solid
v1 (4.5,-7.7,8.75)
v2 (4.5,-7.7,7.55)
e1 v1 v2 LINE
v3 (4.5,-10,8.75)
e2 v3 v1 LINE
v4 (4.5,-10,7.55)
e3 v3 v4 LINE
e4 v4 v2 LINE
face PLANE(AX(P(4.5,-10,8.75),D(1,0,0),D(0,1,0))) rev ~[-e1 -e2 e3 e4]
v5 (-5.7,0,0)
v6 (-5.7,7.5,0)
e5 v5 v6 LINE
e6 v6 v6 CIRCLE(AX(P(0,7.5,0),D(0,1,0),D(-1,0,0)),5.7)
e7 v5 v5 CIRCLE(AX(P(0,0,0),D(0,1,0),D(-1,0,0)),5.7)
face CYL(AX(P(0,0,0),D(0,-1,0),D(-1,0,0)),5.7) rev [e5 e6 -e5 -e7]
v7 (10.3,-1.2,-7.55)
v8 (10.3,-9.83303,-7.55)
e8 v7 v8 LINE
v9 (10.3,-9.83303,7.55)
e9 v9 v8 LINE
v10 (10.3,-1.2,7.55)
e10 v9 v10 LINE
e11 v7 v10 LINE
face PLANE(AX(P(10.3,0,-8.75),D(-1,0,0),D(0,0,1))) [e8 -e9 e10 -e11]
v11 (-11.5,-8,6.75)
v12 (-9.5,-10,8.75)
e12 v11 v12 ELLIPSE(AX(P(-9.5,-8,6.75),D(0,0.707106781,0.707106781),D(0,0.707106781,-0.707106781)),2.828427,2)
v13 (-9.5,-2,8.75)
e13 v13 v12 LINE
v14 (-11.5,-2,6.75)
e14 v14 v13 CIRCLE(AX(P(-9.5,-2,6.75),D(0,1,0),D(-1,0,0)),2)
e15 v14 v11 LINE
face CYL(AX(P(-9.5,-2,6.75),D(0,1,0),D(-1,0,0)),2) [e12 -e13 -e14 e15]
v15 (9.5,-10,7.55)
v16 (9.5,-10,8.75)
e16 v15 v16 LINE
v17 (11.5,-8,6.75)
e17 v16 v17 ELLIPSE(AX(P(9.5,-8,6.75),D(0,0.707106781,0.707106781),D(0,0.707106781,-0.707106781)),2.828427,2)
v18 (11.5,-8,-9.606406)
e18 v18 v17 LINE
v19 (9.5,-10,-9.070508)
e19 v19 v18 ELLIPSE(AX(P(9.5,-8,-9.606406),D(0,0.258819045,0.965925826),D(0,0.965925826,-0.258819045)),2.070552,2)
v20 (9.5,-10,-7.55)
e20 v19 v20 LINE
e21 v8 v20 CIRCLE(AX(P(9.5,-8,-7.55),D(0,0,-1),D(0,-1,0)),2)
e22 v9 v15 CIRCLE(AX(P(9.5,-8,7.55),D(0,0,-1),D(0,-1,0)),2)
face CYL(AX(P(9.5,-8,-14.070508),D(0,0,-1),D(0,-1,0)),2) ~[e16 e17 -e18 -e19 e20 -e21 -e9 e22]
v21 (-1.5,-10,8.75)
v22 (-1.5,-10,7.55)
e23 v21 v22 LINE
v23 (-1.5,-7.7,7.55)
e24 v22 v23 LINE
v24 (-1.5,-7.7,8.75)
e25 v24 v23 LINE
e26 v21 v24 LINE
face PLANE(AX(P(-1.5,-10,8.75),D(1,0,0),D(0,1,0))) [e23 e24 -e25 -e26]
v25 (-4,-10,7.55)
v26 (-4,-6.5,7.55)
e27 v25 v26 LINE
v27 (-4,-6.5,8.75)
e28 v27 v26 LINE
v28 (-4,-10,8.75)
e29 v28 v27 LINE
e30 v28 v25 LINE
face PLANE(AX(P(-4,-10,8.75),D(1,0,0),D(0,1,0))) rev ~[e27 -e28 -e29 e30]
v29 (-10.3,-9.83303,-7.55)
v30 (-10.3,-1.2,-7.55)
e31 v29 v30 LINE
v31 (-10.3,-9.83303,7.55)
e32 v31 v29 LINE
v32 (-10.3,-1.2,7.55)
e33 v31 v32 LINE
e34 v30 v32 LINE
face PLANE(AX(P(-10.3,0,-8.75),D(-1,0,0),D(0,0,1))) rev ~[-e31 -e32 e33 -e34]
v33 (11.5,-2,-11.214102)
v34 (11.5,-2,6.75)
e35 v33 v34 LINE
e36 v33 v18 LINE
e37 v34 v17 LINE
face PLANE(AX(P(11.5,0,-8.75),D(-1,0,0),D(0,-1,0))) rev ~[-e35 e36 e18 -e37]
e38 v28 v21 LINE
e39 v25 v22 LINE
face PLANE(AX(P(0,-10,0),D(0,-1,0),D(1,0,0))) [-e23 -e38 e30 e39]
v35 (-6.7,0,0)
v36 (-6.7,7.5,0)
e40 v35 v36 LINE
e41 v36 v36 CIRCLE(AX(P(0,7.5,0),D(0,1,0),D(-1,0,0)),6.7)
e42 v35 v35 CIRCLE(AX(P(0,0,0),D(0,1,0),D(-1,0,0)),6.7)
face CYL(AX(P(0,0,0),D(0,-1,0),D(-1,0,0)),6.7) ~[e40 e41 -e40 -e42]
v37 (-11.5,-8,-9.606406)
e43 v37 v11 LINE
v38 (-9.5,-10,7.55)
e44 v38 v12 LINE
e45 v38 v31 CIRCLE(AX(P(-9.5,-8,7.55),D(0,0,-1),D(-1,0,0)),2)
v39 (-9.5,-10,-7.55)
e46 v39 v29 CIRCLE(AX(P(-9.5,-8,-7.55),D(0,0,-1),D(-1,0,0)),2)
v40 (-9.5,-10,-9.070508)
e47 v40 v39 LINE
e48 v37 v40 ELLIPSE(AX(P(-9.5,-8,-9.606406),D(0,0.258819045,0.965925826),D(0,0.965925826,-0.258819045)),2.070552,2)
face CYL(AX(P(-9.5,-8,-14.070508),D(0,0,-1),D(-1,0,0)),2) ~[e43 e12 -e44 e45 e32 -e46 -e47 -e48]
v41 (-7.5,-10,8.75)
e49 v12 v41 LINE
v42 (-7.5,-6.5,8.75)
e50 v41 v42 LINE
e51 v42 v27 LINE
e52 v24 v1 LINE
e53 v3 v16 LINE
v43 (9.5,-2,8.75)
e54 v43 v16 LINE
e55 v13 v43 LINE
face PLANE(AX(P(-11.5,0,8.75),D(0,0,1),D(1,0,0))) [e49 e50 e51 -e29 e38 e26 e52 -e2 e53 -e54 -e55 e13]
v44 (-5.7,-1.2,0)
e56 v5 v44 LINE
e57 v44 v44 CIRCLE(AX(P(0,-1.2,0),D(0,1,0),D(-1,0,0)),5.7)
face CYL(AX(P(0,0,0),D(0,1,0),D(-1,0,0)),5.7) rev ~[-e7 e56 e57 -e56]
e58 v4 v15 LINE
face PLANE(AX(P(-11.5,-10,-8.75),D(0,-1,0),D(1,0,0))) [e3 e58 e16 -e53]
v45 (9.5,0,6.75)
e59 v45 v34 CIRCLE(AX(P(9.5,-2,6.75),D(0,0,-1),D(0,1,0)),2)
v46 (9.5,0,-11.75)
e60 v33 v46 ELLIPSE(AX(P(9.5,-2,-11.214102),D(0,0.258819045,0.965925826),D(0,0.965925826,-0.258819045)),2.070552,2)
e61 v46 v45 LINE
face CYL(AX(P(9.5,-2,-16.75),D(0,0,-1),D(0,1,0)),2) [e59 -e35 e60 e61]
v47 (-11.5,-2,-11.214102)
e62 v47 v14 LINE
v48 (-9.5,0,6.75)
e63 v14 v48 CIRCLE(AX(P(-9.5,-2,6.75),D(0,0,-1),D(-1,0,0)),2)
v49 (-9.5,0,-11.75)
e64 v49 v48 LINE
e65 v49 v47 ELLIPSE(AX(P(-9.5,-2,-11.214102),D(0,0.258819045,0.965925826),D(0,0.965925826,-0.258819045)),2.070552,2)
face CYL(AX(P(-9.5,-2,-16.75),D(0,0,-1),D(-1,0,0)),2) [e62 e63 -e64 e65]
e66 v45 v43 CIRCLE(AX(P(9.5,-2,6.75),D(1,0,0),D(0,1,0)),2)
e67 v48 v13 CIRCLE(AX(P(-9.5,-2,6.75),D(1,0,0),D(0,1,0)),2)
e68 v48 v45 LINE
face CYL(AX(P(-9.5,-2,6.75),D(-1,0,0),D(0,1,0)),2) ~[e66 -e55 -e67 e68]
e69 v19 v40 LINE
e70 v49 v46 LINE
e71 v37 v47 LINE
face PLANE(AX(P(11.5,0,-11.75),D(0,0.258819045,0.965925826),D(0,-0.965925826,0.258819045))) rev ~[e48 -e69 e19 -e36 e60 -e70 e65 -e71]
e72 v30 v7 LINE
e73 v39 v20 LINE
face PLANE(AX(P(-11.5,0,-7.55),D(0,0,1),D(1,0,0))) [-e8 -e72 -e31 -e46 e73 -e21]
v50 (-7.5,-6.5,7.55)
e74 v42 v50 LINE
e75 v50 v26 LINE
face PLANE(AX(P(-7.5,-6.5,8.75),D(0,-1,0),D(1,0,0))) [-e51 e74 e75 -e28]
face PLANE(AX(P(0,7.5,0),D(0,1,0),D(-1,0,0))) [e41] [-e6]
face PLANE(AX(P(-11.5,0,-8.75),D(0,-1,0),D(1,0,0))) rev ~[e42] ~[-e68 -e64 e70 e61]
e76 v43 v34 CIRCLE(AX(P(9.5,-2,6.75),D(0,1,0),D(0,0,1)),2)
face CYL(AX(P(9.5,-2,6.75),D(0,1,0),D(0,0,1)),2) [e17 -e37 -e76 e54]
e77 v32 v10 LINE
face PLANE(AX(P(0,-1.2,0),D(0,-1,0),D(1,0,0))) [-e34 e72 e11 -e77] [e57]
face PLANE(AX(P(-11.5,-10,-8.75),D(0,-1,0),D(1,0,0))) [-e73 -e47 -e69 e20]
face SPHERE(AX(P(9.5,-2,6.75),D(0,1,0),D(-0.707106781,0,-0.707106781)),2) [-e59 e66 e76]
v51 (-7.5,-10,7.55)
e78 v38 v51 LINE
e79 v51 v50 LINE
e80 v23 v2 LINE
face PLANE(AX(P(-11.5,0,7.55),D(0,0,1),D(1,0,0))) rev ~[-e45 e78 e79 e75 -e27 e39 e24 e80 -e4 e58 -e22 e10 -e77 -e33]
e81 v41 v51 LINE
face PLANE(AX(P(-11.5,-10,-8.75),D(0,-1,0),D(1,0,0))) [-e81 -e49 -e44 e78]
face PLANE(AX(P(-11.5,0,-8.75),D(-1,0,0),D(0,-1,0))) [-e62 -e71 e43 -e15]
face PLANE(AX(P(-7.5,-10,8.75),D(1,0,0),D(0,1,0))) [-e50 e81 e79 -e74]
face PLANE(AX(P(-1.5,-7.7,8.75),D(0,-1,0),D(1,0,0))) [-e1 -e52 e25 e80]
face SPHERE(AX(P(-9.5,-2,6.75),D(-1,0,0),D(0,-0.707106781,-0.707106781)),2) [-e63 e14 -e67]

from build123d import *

# Parameters (mm, degrees)
F0_W          = 23
F0_H          = 17.5
F1_DEPTH      = 10
F2_T          = -1.2
F3_R          = 5.7
F4_DEPTH      = 3
F3_R_2        = 6.7
F5_DEPTH      = 7.5
F6_W          = 6
F6_H          = 2.3
F6_W_2        = 3.5
F6_H_2        = 3.5
F7_DEPTH      = 4
F8_DEPTH      = 3
F10_DEPTH     = 30
F11_T1_DEPTH  = 19
F11_T3_DEPTH  = 23.5
F11_T5_DEPTH  = 13
F11_T7_DEPTH  = 27.8205080757
F11_S11_W     = 2
F11_S11_H     = 2
F11_T12_DEPTH = 2
F11_S17_W     = 2
F11_S17_H     = 2
F11_T18_DEPTH = 2


# Not quite as in the source:
# - a fillet or chamfer that OpenCascade refuses, or shapes differently, is made with other operations: its cross-section is extruded or revolved along the edge and cut away or added


with BuildPart() as f1:
    # F0 (on Front) → F1 (new body)
    with BuildSketch(Plane.XZ):
        Rectangle(F0_W, F0_H)
    extrude(amount=F1_DEPTH)

    # F2
    f2_openings = [f1.faces().sort_by_distance(p)[0] for p in [
        (0, -10, 0),
    ]]
    offset(amount=F2_T, openings=f2_openings)

    # F3 (on face) → F4 (cut)
    with BuildSketch(Plane(origin=(0, 0, 0), x_dir=(-1, 0, 0), z_dir=(0, 1, 0))):
        Circle(F3_R)
    extrude(amount=-F4_DEPTH, mode=Mode.SUBTRACT)

    # F3 (on face) → F5 (join)
    with BuildSketch(Plane(origin=(0, 0, 0), x_dir=(-1, 0, 0), z_dir=(0, 1, 0))):
        Circle(F3_R_2)
        Circle(F3_R, mode=Mode.SUBTRACT)
    extrude(amount=F5_DEPTH)

    # F6 (on face) → F7 (cut)
    with BuildSketch(Plane.XY.offset(8.75)):
        with Locations((1.5, -8.85)):
            Rectangle(F6_W, F6_H)
        with Locations((-5.75, -8.25)):
            Rectangle(F6_W_2, F6_H_2)
    extrude(amount=-F7_DEPTH, mode=Mode.SUBTRACT)

    # F8 (add): a face of the model
    f8_faces = [f1.faces().sort_by_distance(p)[0] for p in [
        (0, -5, -8.75),
    ]]
    extrude(f8_faces, amount=F8_DEPTH)

    # F9 (on face) → F10 (cut)
    with BuildSketch(Plane.YZ.offset(11.5)):
        Polygon((-10, -11.75), (0, -11.75), (-10, -9.0705080757), align=None)
    extrude(amount=-F10_DEPTH, mode=Mode.SUBTRACT)

    # F11: fillet of radius 2 on 7 edges, made by hand

    # F11_s2 → F11_t1 (cut)
    with BuildSketch(Plane.YZ.offset(-9.5)):
        with BuildLine():
            ThreePointArc((0, 6.75), (-0.5857864376, 8.1642135624), (-2, 8.75))
            Line((-2, 8.75), (0, 8.75))
            Line((0, 8.75), (0, 6.75))
        make_face()
    extrude(amount=F11_T1_DEPTH, mode=Mode.SUBTRACT)

    # F11_s4 → F11_t3 (cut)
    with BuildSketch(Plane.XY.offset(-16.75)):
        with BuildLine():
            ThreePointArc((-11.5, -2), (-10.9142135624, -0.5857864376), (-9.5, 0))
            Line((-9.5, 0), (-11.5, 0))
            Line((-11.5, 0), (-11.5, -2))
        make_face()
        with BuildLine():
            ThreePointArc((9.5, 0), (10.9142135624, -0.5857864376), (11.5, -2))
            Line((11.5, -2), (11.5, 0))
            Line((11.5, 0), (9.5, 0))
        make_face()
    extrude(amount=F11_T3_DEPTH, mode=Mode.SUBTRACT)

    # F11_s6 → F11_t5 (cut)
    with BuildSketch(Plane.XZ.offset(2)):
        with BuildLine():
            ThreePointArc((9.5, 8.75), (10.9142135624, 8.1642135624), (11.5, 6.75))
            Line((11.5, 6.75), (11.5, 8.75))
            Line((11.5, 8.75), (9.5, 8.75))
        make_face()
        with BuildLine():
            ThreePointArc((-11.5, 6.75), (-10.9142135624, 8.1642135624), (-9.5, 8.75))
            Line((-9.5, 8.75), (-11.5, 8.75))
            Line((-11.5, 8.75), (-11.5, 6.75))
        make_face()
    extrude(amount=F11_T5_DEPTH, mode=Mode.SUBTRACT)

    # F11_s8 → F11_t7 (cut)
    with BuildSketch(Plane.XY.offset(-14.0705080757)):
        with BuildLine():
            ThreePointArc((-11.5, -8), (-10.9142135624, -9.4142135624), (-9.5, -10))
            Line((-9.5, -10), (-11.5, -10))
            Line((-11.5, -10), (-11.5, -8))
        make_face()
        with BuildLine():
            ThreePointArc((9.5, -10), (10.9142135624, -9.4142135624), (11.5, -8))
            Line((11.5, -8), (11.5, -10))
            Line((11.5, -10), (9.5, -10))
        make_face()
    extrude(amount=F11_T7_DEPTH, mode=Mode.SUBTRACT)


with BuildPart() as f11_tool10:
    # F11_s11 → F11_t12 (new body)
    with BuildSketch(Plane.XZ.offset(2)):
        with Locations((10.5, 7.75)):
            Rectangle(F11_S11_W, F11_S11_H)
    extrude(amount=-F11_T12_DEPTH)

    # F11_s13 → F11_t14 (revolve, cut)
    with BuildSketch(Plane(origin=(9.5, -2, 6.75), x_dir=(-0.7071067812, 0, -0.7071067812), z_dir=(0.7071067812, 0, -0.7071067812))):
        with BuildLine():
            ThreePointArc((0, -2), (2, 0), (0, 2))
            Line((0, 2), (0, -2))
        make_face()
    revolve(axis=Axis((9.5, -2, 6.75), (0, 1, 0)), mode=Mode.SUBTRACT)


with BuildPart() as f1_1:
    add(f1.part)

    # F11_t9: cut F11_tool10
    add(f11_tool10.part, mode=Mode.SUBTRACT)


with BuildPart() as f11_tool16:
    # F11_s17 → F11_t18 (new body)
    with BuildSketch(Plane.YZ.offset(-9.5)):
        with Locations((-1, 7.75)):
            Rectangle(F11_S17_W, F11_S17_H)
    extrude(amount=-F11_T18_DEPTH)

    # F11_s19 → F11_t20 (revolve, cut)
    with BuildSketch(Plane(origin=(-9.5, -2, 6.75), x_dir=(0, -0.7071067812, -0.7071067812), z_dir=(0, 0.7071067812, -0.7071067812))):
        with BuildLine():
            ThreePointArc((0, -2), (2, 0), (0, 2))
            Line((0, 2), (0, -2))
        make_face()
    revolve(axis=Axis((-9.5, -2, 6.75), (-1, 0, 0)), mode=Mode.SUBTRACT)


with BuildPart() as f1_2:
    add(f1_1.part)

    # F11_t15: cut F11_tool16
    add(f11_tool16.part, mode=Mode.SUBTRACT)


solid = f1_2.part
